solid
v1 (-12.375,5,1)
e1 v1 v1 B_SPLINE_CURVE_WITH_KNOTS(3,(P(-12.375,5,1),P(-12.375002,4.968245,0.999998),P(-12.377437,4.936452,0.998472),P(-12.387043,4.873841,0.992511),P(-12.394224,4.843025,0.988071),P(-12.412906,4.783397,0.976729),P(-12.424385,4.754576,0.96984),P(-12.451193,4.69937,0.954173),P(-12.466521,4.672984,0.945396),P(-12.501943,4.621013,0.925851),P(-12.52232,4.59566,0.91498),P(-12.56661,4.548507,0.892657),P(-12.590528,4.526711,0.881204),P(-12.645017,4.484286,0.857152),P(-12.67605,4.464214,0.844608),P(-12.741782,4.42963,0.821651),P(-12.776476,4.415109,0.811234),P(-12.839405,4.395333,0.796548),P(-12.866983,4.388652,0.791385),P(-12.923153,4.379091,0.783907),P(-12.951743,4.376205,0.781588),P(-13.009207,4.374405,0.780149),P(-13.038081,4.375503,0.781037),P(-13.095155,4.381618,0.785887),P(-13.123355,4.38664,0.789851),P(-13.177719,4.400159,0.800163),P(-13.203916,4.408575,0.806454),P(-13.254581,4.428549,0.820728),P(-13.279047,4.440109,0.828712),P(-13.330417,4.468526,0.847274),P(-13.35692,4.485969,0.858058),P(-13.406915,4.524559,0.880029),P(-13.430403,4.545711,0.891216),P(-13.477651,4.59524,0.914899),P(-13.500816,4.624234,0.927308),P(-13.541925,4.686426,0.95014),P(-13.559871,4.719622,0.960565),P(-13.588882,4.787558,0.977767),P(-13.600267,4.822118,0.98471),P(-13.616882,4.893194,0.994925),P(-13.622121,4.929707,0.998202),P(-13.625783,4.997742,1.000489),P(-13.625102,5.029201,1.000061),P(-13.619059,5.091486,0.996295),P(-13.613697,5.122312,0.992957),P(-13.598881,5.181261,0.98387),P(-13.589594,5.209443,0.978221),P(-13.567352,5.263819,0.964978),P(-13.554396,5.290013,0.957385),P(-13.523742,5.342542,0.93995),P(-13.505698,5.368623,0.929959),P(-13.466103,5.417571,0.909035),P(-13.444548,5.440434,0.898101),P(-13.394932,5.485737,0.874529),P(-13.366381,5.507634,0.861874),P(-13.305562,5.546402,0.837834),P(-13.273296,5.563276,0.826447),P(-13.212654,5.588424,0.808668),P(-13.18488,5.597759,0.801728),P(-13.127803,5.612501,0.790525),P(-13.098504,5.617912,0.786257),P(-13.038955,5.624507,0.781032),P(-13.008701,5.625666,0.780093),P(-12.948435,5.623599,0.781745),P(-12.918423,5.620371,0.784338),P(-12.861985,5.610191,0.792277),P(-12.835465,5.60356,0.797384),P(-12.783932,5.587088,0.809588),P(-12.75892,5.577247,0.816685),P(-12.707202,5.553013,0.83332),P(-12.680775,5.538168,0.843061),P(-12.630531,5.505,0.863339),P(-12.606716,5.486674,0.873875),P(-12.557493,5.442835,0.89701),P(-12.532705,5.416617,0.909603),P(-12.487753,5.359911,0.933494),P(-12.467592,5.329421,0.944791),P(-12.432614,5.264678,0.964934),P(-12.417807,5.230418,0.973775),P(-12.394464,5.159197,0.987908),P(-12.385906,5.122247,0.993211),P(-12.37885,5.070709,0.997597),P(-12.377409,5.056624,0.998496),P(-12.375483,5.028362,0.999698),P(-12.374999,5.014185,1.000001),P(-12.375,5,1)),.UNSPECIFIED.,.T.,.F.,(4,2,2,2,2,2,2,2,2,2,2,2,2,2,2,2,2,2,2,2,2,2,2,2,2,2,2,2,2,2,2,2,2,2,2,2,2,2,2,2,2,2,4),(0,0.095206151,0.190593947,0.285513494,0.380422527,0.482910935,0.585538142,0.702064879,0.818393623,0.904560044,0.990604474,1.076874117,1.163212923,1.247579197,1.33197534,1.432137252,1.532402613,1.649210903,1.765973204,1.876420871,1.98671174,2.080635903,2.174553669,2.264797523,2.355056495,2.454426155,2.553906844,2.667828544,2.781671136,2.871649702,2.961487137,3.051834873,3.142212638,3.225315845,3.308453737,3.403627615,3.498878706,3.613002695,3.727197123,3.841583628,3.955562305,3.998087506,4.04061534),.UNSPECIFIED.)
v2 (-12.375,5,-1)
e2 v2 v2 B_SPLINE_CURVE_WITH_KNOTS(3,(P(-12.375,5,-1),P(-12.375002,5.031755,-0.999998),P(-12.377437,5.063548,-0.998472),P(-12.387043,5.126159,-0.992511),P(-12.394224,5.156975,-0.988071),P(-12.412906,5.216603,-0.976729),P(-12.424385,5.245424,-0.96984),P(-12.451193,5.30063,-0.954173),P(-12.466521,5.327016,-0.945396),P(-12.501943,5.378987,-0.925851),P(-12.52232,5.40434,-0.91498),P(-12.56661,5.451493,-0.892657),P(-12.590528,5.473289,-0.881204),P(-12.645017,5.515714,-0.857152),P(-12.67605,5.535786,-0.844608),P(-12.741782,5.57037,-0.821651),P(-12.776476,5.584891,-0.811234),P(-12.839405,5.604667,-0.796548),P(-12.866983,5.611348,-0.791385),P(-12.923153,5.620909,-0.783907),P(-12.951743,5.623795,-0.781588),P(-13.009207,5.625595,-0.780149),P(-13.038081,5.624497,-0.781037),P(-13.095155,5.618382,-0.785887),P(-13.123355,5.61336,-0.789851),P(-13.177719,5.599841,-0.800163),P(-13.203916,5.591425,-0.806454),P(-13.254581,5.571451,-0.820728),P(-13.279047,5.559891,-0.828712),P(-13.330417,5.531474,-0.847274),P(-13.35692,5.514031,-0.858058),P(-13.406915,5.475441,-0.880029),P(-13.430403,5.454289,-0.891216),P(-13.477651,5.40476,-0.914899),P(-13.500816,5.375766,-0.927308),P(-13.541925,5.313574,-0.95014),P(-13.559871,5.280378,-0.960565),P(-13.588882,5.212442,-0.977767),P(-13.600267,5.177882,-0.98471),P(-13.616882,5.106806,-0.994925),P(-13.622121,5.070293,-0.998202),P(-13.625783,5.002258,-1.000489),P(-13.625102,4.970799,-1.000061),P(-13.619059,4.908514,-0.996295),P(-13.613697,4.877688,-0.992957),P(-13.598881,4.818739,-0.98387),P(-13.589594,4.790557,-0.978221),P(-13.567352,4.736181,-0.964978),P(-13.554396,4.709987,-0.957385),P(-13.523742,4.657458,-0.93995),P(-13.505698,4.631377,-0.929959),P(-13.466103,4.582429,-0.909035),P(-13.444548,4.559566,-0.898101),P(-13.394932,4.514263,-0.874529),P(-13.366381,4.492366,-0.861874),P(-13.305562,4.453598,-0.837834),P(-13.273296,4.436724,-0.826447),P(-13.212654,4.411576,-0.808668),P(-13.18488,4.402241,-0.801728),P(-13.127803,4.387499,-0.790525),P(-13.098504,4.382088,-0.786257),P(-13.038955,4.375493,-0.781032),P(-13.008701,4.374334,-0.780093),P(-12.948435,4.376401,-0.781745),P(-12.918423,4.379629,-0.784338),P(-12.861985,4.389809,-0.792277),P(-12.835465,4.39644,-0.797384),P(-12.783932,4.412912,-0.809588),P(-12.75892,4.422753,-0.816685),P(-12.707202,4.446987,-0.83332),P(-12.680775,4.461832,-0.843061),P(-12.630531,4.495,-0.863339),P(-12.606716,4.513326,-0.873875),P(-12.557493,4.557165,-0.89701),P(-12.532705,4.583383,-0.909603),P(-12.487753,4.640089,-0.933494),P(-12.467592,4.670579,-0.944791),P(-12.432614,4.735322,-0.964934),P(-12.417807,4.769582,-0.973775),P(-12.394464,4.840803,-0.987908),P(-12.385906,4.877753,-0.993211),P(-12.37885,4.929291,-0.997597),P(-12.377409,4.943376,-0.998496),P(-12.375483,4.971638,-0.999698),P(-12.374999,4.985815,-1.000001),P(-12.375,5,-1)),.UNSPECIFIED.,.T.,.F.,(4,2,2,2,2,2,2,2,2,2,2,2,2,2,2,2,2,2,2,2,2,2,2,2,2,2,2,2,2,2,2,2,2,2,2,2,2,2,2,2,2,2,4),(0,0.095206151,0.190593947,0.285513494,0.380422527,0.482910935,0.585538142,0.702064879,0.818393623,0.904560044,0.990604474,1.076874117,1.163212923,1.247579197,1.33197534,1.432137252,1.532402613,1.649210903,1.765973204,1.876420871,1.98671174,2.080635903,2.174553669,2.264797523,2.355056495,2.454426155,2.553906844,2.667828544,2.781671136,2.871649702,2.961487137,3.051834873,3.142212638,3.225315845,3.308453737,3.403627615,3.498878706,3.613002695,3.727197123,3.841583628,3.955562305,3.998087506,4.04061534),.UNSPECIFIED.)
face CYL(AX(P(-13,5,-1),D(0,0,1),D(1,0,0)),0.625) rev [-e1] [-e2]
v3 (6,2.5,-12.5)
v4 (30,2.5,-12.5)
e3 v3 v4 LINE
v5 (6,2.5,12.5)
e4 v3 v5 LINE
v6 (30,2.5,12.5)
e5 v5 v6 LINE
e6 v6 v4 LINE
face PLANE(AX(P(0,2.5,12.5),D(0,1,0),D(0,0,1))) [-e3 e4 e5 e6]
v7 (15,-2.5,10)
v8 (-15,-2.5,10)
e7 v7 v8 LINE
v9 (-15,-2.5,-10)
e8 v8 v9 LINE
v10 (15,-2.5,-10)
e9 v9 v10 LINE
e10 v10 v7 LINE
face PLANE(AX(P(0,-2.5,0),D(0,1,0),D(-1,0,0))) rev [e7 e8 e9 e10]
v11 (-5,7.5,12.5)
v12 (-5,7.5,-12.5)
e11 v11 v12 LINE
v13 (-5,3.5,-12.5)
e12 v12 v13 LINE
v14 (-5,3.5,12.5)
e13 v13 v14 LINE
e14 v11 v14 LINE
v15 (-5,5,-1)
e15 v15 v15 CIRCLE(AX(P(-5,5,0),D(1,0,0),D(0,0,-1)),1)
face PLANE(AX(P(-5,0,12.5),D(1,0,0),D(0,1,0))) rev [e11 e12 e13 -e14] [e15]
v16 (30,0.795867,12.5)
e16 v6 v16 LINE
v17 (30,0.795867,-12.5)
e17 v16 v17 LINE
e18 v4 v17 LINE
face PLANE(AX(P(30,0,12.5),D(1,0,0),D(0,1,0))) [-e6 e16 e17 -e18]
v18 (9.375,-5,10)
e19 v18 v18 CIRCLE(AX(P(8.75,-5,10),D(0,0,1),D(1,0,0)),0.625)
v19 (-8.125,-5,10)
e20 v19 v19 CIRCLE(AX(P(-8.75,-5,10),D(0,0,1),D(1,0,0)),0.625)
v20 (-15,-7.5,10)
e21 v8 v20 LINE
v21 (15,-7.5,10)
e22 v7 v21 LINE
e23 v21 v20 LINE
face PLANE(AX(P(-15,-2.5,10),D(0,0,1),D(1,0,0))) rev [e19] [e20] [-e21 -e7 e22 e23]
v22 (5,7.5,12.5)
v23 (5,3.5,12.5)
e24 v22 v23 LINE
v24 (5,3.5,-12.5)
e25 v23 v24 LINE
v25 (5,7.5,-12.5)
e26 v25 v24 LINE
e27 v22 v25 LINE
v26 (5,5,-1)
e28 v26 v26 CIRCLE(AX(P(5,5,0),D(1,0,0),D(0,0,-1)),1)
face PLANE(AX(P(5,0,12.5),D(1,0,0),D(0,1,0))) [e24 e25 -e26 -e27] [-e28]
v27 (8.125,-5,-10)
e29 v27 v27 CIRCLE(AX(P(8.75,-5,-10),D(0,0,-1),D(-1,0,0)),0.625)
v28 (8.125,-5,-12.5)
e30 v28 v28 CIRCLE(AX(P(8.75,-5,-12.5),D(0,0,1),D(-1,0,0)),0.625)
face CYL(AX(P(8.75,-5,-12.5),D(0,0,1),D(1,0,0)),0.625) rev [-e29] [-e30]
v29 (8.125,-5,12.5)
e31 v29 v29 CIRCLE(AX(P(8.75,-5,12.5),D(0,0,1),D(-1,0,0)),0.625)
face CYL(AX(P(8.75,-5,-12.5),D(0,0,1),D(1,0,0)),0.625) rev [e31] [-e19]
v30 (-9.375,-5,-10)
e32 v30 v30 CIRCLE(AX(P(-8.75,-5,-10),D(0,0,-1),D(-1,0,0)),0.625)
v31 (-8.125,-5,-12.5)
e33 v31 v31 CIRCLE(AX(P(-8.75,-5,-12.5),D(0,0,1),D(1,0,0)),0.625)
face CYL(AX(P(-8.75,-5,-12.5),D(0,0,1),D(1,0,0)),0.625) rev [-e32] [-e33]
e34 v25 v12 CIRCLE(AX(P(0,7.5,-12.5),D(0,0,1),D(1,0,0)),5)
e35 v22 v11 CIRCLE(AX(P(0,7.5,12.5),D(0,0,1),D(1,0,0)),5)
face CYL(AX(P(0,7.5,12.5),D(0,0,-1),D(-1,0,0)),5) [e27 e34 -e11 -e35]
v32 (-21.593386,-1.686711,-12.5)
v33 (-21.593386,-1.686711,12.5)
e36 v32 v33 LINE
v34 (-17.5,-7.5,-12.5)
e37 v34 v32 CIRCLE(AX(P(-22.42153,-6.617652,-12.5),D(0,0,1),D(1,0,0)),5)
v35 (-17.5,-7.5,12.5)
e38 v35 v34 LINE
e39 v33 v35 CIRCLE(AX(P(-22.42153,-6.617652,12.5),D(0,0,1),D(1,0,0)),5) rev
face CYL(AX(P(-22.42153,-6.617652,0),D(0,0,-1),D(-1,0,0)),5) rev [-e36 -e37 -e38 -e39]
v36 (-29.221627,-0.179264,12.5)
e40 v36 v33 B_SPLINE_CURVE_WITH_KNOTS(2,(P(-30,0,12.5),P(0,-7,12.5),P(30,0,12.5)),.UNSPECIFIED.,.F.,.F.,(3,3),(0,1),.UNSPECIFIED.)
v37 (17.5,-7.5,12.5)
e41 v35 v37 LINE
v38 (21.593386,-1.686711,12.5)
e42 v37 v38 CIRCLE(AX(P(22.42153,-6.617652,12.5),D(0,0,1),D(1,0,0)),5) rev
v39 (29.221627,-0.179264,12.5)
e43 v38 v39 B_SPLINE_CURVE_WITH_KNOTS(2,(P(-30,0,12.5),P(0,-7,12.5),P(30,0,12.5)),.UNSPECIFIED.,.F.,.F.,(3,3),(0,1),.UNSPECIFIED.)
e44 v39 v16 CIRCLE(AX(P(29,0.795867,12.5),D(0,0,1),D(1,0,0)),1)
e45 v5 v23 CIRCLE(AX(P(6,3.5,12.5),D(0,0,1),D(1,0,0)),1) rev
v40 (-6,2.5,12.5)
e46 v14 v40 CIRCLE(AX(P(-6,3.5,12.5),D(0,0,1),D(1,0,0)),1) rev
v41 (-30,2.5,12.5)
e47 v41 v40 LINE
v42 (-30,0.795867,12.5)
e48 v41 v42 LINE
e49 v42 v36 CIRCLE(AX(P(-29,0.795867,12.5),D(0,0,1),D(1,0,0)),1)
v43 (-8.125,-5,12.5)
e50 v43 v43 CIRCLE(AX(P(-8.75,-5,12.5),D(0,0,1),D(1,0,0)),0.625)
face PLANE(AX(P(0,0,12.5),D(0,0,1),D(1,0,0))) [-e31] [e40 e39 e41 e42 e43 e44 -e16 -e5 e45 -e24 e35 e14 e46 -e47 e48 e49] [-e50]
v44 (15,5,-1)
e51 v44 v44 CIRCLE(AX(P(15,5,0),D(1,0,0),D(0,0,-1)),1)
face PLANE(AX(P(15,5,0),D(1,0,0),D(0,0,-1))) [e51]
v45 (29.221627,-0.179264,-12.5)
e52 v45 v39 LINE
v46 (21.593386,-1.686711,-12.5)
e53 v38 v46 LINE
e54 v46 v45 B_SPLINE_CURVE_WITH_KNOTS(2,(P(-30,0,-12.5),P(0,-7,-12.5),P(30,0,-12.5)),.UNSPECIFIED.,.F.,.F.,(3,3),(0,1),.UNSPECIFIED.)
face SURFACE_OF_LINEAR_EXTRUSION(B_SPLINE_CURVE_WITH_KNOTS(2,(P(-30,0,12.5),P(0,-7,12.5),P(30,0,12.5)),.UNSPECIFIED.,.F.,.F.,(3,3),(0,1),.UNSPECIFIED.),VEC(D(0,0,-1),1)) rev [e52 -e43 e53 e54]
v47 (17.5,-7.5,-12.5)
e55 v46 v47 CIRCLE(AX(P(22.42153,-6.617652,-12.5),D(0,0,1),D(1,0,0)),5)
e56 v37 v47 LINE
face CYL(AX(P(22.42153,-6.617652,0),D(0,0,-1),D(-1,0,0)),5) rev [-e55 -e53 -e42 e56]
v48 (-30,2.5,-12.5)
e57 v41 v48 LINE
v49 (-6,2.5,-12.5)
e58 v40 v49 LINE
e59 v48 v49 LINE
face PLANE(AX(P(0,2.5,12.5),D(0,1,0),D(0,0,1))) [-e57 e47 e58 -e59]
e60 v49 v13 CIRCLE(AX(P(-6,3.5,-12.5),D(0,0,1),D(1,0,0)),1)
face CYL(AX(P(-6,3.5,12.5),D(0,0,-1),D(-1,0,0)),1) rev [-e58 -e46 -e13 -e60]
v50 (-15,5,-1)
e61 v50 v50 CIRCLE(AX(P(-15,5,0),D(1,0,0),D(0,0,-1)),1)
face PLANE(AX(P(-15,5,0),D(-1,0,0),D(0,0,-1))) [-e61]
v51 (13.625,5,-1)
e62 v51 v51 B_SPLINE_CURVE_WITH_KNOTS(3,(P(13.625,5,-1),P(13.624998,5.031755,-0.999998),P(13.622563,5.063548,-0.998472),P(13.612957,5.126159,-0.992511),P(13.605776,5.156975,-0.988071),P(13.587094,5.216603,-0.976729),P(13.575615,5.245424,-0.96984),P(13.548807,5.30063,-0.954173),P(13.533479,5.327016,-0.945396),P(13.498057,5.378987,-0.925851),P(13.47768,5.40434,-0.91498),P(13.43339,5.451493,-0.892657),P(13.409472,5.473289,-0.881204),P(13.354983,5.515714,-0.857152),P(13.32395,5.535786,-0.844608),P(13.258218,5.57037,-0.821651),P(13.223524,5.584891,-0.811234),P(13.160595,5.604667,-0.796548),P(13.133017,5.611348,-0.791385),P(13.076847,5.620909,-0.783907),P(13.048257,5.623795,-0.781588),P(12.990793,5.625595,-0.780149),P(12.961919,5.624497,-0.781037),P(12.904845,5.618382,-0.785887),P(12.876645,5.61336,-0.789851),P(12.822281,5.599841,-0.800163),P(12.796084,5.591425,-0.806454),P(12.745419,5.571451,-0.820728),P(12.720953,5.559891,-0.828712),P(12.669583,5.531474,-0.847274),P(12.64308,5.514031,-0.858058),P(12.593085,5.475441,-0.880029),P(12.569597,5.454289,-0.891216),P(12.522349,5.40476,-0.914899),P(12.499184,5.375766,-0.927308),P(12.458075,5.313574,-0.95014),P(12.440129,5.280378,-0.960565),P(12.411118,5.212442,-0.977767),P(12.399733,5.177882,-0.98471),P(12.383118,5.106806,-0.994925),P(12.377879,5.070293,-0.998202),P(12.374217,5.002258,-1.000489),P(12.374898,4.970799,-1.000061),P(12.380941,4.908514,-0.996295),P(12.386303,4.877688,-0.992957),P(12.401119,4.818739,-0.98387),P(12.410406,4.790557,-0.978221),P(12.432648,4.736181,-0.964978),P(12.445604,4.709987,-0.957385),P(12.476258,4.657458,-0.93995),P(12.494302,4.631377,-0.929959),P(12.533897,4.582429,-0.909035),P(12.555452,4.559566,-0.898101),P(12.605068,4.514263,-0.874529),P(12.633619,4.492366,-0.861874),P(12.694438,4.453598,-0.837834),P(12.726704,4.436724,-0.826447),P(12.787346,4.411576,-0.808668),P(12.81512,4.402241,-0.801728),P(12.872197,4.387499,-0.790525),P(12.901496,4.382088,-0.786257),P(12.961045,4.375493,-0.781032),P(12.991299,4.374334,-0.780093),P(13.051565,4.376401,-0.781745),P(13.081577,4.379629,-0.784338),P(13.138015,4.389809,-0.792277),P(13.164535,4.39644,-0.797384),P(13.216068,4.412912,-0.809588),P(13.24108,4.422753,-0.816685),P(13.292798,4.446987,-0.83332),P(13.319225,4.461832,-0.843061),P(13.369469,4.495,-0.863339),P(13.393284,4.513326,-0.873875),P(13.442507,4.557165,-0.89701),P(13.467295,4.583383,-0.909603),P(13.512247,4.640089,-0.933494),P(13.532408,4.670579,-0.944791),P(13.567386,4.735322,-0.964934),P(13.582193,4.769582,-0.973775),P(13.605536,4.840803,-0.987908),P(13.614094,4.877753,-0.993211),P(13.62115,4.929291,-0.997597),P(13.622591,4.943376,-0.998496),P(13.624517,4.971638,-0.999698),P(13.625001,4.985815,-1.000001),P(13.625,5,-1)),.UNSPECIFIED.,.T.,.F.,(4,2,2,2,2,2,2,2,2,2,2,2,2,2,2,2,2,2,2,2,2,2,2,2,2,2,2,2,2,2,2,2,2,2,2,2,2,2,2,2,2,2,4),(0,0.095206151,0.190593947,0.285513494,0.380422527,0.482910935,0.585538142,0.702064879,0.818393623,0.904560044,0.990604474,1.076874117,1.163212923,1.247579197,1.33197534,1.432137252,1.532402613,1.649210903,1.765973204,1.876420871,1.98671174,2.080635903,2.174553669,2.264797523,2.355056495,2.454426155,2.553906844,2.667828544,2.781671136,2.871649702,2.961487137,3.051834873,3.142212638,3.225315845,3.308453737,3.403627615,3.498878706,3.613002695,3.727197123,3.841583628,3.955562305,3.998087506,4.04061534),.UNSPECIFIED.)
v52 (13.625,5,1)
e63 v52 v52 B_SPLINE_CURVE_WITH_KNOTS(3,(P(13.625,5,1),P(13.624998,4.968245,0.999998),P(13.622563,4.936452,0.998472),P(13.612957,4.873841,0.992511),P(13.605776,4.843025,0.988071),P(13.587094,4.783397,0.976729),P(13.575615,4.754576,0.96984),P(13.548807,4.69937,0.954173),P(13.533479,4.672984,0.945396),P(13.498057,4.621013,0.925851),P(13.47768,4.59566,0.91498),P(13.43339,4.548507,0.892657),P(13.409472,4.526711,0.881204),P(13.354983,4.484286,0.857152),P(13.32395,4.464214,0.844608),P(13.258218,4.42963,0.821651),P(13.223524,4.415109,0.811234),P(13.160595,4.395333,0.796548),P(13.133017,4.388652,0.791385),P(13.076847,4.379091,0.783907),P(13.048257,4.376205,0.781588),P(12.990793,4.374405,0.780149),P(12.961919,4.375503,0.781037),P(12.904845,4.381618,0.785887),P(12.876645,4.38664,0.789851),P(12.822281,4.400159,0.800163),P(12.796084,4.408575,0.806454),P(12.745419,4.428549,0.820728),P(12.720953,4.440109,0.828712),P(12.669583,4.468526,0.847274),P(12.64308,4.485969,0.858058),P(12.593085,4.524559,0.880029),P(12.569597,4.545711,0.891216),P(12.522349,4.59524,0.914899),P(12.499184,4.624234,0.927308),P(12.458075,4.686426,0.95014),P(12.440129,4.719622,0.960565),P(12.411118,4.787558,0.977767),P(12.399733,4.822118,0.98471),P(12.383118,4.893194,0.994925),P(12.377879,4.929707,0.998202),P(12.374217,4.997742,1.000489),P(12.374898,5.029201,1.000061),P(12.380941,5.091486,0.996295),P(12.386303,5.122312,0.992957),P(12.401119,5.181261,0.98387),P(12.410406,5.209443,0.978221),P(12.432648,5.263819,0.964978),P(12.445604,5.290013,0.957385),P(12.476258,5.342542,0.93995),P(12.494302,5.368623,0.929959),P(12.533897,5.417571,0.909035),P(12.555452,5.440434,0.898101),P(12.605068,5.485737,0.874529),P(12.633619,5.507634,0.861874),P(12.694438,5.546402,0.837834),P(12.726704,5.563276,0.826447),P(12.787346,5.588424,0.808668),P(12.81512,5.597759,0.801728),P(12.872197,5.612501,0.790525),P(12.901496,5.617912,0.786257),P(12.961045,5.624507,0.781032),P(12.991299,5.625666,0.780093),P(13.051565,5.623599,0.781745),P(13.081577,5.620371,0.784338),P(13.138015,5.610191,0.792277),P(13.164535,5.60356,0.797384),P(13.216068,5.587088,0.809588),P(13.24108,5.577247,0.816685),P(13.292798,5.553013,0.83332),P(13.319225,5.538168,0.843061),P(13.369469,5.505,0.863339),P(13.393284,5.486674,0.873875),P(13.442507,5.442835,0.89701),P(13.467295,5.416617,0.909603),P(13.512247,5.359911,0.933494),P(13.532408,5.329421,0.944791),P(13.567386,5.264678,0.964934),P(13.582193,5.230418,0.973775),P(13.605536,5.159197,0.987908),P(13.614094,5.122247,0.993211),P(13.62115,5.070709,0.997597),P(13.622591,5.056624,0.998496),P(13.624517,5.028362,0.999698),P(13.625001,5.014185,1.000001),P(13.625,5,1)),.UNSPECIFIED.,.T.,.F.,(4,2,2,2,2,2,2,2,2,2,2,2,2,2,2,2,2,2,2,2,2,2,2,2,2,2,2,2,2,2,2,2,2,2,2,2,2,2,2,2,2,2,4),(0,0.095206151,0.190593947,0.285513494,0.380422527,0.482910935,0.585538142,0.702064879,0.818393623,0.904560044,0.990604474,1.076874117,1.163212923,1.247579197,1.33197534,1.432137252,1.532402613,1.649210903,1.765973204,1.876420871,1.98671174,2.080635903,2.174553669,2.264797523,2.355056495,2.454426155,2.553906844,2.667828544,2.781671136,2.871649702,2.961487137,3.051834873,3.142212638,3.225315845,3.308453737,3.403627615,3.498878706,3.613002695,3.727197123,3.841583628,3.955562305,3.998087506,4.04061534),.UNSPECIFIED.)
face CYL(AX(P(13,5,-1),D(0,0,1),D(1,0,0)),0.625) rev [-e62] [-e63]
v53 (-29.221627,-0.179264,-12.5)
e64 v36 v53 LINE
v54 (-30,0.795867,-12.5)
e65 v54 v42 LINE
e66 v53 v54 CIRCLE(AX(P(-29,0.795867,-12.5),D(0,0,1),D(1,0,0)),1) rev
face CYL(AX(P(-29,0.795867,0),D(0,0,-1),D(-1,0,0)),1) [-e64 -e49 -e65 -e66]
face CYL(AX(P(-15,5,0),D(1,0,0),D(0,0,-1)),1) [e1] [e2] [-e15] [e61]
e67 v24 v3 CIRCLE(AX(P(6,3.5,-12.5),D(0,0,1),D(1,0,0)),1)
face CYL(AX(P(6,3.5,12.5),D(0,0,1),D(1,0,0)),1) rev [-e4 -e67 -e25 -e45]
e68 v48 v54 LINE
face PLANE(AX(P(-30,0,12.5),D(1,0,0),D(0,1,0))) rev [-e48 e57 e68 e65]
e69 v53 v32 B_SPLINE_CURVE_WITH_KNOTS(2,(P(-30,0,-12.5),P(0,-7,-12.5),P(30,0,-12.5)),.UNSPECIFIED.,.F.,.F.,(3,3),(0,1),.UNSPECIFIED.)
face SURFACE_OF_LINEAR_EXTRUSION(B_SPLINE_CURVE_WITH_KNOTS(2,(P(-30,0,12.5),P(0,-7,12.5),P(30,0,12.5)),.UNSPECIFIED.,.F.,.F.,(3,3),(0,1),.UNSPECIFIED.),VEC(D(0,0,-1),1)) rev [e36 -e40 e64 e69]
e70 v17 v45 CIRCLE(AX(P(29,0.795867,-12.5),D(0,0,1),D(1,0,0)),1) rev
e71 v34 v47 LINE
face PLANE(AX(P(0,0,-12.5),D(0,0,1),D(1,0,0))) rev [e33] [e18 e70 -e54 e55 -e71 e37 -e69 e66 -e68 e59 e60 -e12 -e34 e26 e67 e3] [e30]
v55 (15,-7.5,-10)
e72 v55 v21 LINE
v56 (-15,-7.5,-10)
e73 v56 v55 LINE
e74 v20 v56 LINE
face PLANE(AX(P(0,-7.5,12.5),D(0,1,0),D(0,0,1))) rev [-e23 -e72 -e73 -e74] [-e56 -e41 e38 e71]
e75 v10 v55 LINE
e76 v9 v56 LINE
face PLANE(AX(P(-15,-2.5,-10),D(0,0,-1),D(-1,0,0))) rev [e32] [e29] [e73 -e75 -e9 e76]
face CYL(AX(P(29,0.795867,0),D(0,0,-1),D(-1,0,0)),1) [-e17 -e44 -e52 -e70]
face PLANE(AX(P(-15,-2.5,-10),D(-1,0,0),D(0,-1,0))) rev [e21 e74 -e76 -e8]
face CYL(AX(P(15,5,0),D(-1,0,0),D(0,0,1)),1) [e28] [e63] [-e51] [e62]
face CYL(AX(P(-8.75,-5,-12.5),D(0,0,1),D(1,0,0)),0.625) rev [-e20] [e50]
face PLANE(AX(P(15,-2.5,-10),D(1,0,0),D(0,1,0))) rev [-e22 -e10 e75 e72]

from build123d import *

# Parameters (mm, degrees)
BOSS_EXTRUDE1_DEPTH = 12.5
SKETCH15_R          = 1
BOSS_EXTRUDE2_DEPTH = 10
SKETCH19_R          = 0.625
CUT_EXTRUDE2_DEPTH  = 1
FILLET1_R           = 1
FILLET9_R           = 5
SKETCH32_W          = 30
SKETCH32_H          = 20
CUT_EXTRUDE10_DEPTH = 5
SKETCH34_R          = 0.625
CUT_EXTRUDE9_DEPTH  = 12.5


with BuildPart() as part:
    # Sketch1 → Boss-Extrude1 (new, symmetric)
    with BuildSketch(Plane.XY):
        with BuildLine():
            Line((-30, 2.5), (30, 2.5))
            Line((30, 2.5), (30, 0))
            add(Edge.make_bspline(
                [(-30, 0), (0, -7), (30, 0)],
                knots=[0, 0, 0, 1, 1, 1], degree=2))
            Line((-30, 0), (-30, 2.5))
        make_face()
        with BuildLine():
            Line((5, 7.5), (5, -3.402777778))
            Line((5, -3.402777778), (17.5, -7.5))
            Line((17.5, -7.5), (-17.5, -7.5))
            Line((-17.5, -7.5), (-5, -3.402777778))
            Line((-5, -3.402777778), (-5, 7.5))
            ThreePointArc((-5, 7.5), (0, 12.5), (5, 7.5))
        make_face()
    extrude(amount=BOSS_EXTRUDE1_DEPTH, both=True)

    # Sketch15 → Boss-Extrude2 (add)
    with BuildSketch(Plane(origin=(5, 0, 0), x_dir=(0, 0, -1), z_dir=(1, 0, 0))):
        with Locations((0, 5)):
            Circle(SKETCH15_R)
    boss_extrude2 = extrude(amount=BOSS_EXTRUDE2_DEPTH)

    # Sketch19 → Cut-Extrude2 (cut, symmetric)
    with BuildSketch(Plane.XY):
        with Locations((13, 5)):
            Circle(SKETCH19_R)
    cut_extrude2 = extrude(amount=CUT_EXTRUDE2_DEPTH, both=True, mode=Mode.SUBTRACT)

    # Mirror1: Boss-Extrude2, Cut-Extrude2 across plane
    add(boss_extrude2.mirror(Plane(origin=(0, 0, 0), x_dir=(0, 0, 1), z_dir=(1, 0, 0))))
    add(cut_extrude2.mirror(Plane(origin=(0, 0, 0), x_dir=(0, 0, 1), z_dir=(1, 0, 0))), mode=Mode.SUBTRACT)

    # Fillet1
    fillet1_edges = [part.edges().sort_by_distance(p)[0] for p in [
        (-30, 0, -6.25),
        (30, 0, 6.25),
        (5, 2.5, 0),
        (-5, 2.5, 0),
    ]]
    fillet(fillet1_edges, radius=FILLET1_R)

    # Fillet9
    # the kernel refuses this fillet: 5 mm, written as the material it adds along each edge
    with BuildSketch(Plane(origin=(5, -3.402777778, 12.5), x_dir=(0.9502551587034467, -0.3114725242416856, 0), z_dir=(0, 0, -1))) as fillet9_piece_1_section:
        with BuildLine():
            CenterArc((17.556244054, -2.371377478), FILLET9_R, 151.687811906, 90.630424807)
            Line((15.233443006, -6.799085157), (15.186986985, -6.88763931))
            ThreePointArc((15.186986985, -6.88763931), (7.684520329, -3.247724547), (-0.034816372, -0.093743374))
            Line((-0.034816372, -0.093743374), (0, 0.1))
            ThreePointArc((0, 0.1), (6.577180816, 0.1), (13.066323983, 0.04742755))
            Line((13.066323983, 0.04742755), (13.154361632, 0))
        make_face()
    fillet9_piece_1 = extrude(amount=12.5, mode=Mode.PRIVATE)
    fillet9_piece_1 = split(fillet9_piece_1, bisect_by=Plane(origin=(13.76615202, -7.5, 6.25), z_dir=(0, 1, 0)), keep=Keep.TOP, mode=Mode.PRIVATE)
    add(fillet9_piece_1)
    with BuildSketch(Plane(origin=(-5, -3.402777778, 0), x_dir=(-0.9946948021356532, 0.10287006660984462, 0), z_dir=(0, 0, 1))) as fillet9_piece_2_section:
        with BuildLine():
            CenterArc((16.998391443, 4.989972421), FILLET9_R, 175.740271774, 90.630424807)
            Line((12.012203504, 5.36136148), (11.912479745, 5.368789261))
            ThreePointArc((11.912479745, 5.368789261), (5.965344461, 2.771998007), (-0.040757291, 0.091317267))
            Line((-0.040757291, 0.091317267), (0.006413901, -0.099794097))
            ThreePointArc((0.006413901, -0.099794097), (8.340978482, 0.166269042), (16.675556633, -0.099799448))
            Line((16.675556633, -0.099799448), (16.681886727, 0))
        make_face()
    fillet9_piece_2 = extrude(amount=12.5, mode=Mode.PRIVATE)
    fillet9_piece_2 = split(fillet9_piece_2, bisect_by=Plane(origin=(-13.76615202, -7.5, 6.25), z_dir=(0, 1, 0)), keep=Keep.TOP, mode=Mode.PRIVATE)
    add(fillet9_piece_2)
    with BuildSketch(Plane(origin=(-5, -3.402777778, -12.5), x_dir=(-0.9502551587034468, -0.31147252424168526, 0), z_dir=(0, 0, 1))) as fillet9_piece_3_section:
        with BuildLine():
            CenterArc((17.556244054, -2.371377478), FILLET9_R, 151.687811906, 90.630424807)
            Line((15.233443006, -6.799085157), (15.186986985, -6.88763931))
            ThreePointArc((15.186986985, -6.88763931), (7.684520329, -3.247724547), (-0.034816372, -0.093743374))
            Line((-0.034816372, -0.093743374), (0, 0.1))
            ThreePointArc((0, 0.1), (6.577180816, 0.1), (13.066323983, 0.04742755))
            Line((13.066323983, 0.04742755), (13.154361632, 0))
        make_face()
    fillet9_piece_3 = extrude(amount=12.5, mode=Mode.PRIVATE)
    fillet9_piece_3 = split(fillet9_piece_3, bisect_by=Plane(origin=(-13.76615202, -7.5, -6.25), z_dir=(0, 1, 0)), keep=Keep.TOP, mode=Mode.PRIVATE)
    add(fillet9_piece_3)
    with BuildSketch(Plane(origin=(5, -3.402777778, 0), x_dir=(0.9502551587034467, -0.3114725242416856, 0), z_dir=(0, 0, -1))) as fillet9_piece_4_section:
        with BuildLine():
            CenterArc((17.556244054, -2.371377478), FILLET9_R, 151.687811906, 90.630424807)
            Line((15.233443006, -6.799085157), (15.186986985, -6.88763931))
            ThreePointArc((15.186986985, -6.88763931), (7.684520329, -3.247724547), (-0.034816372, -0.093743374))
            Line((-0.034816372, -0.093743374), (0, 0.1))
            ThreePointArc((0, 0.1), (6.577180816, 0.1), (13.066323983, 0.04742755))
            Line((13.066323983, 0.04742755), (13.154361632, 0))
        make_face()
    fillet9_piece_4 = extrude(amount=12.5, mode=Mode.PRIVATE)
    fillet9_piece_4 = split(fillet9_piece_4, bisect_by=Plane(origin=(13.76615202, -7.5, -6.25), z_dir=(0, 1, 0)), keep=Keep.TOP, mode=Mode.PRIVATE)
    add(fillet9_piece_4)

    # Sketch32 → Cut-Extrude10 (cut)
    with BuildSketch(Plane.XZ.offset(7.5)):
        Rectangle(SKETCH32_W, SKETCH32_H)
    extrude(amount=-CUT_EXTRUDE10_DEPTH, mode=Mode.SUBTRACT)

    # Sketch34 → Cut-Extrude9 (cut, symmetric)
    with BuildSketch(Plane.XY):
        with Locations((-8.75, -5)):
            Circle(SKETCH34_R)
        with Locations((8.75, -5)):
            Circle(SKETCH34_R)
    extrude(amount=CUT_EXTRUDE9_DEPTH, both=True, mode=Mode.SUBTRACT)


solid = part.part
